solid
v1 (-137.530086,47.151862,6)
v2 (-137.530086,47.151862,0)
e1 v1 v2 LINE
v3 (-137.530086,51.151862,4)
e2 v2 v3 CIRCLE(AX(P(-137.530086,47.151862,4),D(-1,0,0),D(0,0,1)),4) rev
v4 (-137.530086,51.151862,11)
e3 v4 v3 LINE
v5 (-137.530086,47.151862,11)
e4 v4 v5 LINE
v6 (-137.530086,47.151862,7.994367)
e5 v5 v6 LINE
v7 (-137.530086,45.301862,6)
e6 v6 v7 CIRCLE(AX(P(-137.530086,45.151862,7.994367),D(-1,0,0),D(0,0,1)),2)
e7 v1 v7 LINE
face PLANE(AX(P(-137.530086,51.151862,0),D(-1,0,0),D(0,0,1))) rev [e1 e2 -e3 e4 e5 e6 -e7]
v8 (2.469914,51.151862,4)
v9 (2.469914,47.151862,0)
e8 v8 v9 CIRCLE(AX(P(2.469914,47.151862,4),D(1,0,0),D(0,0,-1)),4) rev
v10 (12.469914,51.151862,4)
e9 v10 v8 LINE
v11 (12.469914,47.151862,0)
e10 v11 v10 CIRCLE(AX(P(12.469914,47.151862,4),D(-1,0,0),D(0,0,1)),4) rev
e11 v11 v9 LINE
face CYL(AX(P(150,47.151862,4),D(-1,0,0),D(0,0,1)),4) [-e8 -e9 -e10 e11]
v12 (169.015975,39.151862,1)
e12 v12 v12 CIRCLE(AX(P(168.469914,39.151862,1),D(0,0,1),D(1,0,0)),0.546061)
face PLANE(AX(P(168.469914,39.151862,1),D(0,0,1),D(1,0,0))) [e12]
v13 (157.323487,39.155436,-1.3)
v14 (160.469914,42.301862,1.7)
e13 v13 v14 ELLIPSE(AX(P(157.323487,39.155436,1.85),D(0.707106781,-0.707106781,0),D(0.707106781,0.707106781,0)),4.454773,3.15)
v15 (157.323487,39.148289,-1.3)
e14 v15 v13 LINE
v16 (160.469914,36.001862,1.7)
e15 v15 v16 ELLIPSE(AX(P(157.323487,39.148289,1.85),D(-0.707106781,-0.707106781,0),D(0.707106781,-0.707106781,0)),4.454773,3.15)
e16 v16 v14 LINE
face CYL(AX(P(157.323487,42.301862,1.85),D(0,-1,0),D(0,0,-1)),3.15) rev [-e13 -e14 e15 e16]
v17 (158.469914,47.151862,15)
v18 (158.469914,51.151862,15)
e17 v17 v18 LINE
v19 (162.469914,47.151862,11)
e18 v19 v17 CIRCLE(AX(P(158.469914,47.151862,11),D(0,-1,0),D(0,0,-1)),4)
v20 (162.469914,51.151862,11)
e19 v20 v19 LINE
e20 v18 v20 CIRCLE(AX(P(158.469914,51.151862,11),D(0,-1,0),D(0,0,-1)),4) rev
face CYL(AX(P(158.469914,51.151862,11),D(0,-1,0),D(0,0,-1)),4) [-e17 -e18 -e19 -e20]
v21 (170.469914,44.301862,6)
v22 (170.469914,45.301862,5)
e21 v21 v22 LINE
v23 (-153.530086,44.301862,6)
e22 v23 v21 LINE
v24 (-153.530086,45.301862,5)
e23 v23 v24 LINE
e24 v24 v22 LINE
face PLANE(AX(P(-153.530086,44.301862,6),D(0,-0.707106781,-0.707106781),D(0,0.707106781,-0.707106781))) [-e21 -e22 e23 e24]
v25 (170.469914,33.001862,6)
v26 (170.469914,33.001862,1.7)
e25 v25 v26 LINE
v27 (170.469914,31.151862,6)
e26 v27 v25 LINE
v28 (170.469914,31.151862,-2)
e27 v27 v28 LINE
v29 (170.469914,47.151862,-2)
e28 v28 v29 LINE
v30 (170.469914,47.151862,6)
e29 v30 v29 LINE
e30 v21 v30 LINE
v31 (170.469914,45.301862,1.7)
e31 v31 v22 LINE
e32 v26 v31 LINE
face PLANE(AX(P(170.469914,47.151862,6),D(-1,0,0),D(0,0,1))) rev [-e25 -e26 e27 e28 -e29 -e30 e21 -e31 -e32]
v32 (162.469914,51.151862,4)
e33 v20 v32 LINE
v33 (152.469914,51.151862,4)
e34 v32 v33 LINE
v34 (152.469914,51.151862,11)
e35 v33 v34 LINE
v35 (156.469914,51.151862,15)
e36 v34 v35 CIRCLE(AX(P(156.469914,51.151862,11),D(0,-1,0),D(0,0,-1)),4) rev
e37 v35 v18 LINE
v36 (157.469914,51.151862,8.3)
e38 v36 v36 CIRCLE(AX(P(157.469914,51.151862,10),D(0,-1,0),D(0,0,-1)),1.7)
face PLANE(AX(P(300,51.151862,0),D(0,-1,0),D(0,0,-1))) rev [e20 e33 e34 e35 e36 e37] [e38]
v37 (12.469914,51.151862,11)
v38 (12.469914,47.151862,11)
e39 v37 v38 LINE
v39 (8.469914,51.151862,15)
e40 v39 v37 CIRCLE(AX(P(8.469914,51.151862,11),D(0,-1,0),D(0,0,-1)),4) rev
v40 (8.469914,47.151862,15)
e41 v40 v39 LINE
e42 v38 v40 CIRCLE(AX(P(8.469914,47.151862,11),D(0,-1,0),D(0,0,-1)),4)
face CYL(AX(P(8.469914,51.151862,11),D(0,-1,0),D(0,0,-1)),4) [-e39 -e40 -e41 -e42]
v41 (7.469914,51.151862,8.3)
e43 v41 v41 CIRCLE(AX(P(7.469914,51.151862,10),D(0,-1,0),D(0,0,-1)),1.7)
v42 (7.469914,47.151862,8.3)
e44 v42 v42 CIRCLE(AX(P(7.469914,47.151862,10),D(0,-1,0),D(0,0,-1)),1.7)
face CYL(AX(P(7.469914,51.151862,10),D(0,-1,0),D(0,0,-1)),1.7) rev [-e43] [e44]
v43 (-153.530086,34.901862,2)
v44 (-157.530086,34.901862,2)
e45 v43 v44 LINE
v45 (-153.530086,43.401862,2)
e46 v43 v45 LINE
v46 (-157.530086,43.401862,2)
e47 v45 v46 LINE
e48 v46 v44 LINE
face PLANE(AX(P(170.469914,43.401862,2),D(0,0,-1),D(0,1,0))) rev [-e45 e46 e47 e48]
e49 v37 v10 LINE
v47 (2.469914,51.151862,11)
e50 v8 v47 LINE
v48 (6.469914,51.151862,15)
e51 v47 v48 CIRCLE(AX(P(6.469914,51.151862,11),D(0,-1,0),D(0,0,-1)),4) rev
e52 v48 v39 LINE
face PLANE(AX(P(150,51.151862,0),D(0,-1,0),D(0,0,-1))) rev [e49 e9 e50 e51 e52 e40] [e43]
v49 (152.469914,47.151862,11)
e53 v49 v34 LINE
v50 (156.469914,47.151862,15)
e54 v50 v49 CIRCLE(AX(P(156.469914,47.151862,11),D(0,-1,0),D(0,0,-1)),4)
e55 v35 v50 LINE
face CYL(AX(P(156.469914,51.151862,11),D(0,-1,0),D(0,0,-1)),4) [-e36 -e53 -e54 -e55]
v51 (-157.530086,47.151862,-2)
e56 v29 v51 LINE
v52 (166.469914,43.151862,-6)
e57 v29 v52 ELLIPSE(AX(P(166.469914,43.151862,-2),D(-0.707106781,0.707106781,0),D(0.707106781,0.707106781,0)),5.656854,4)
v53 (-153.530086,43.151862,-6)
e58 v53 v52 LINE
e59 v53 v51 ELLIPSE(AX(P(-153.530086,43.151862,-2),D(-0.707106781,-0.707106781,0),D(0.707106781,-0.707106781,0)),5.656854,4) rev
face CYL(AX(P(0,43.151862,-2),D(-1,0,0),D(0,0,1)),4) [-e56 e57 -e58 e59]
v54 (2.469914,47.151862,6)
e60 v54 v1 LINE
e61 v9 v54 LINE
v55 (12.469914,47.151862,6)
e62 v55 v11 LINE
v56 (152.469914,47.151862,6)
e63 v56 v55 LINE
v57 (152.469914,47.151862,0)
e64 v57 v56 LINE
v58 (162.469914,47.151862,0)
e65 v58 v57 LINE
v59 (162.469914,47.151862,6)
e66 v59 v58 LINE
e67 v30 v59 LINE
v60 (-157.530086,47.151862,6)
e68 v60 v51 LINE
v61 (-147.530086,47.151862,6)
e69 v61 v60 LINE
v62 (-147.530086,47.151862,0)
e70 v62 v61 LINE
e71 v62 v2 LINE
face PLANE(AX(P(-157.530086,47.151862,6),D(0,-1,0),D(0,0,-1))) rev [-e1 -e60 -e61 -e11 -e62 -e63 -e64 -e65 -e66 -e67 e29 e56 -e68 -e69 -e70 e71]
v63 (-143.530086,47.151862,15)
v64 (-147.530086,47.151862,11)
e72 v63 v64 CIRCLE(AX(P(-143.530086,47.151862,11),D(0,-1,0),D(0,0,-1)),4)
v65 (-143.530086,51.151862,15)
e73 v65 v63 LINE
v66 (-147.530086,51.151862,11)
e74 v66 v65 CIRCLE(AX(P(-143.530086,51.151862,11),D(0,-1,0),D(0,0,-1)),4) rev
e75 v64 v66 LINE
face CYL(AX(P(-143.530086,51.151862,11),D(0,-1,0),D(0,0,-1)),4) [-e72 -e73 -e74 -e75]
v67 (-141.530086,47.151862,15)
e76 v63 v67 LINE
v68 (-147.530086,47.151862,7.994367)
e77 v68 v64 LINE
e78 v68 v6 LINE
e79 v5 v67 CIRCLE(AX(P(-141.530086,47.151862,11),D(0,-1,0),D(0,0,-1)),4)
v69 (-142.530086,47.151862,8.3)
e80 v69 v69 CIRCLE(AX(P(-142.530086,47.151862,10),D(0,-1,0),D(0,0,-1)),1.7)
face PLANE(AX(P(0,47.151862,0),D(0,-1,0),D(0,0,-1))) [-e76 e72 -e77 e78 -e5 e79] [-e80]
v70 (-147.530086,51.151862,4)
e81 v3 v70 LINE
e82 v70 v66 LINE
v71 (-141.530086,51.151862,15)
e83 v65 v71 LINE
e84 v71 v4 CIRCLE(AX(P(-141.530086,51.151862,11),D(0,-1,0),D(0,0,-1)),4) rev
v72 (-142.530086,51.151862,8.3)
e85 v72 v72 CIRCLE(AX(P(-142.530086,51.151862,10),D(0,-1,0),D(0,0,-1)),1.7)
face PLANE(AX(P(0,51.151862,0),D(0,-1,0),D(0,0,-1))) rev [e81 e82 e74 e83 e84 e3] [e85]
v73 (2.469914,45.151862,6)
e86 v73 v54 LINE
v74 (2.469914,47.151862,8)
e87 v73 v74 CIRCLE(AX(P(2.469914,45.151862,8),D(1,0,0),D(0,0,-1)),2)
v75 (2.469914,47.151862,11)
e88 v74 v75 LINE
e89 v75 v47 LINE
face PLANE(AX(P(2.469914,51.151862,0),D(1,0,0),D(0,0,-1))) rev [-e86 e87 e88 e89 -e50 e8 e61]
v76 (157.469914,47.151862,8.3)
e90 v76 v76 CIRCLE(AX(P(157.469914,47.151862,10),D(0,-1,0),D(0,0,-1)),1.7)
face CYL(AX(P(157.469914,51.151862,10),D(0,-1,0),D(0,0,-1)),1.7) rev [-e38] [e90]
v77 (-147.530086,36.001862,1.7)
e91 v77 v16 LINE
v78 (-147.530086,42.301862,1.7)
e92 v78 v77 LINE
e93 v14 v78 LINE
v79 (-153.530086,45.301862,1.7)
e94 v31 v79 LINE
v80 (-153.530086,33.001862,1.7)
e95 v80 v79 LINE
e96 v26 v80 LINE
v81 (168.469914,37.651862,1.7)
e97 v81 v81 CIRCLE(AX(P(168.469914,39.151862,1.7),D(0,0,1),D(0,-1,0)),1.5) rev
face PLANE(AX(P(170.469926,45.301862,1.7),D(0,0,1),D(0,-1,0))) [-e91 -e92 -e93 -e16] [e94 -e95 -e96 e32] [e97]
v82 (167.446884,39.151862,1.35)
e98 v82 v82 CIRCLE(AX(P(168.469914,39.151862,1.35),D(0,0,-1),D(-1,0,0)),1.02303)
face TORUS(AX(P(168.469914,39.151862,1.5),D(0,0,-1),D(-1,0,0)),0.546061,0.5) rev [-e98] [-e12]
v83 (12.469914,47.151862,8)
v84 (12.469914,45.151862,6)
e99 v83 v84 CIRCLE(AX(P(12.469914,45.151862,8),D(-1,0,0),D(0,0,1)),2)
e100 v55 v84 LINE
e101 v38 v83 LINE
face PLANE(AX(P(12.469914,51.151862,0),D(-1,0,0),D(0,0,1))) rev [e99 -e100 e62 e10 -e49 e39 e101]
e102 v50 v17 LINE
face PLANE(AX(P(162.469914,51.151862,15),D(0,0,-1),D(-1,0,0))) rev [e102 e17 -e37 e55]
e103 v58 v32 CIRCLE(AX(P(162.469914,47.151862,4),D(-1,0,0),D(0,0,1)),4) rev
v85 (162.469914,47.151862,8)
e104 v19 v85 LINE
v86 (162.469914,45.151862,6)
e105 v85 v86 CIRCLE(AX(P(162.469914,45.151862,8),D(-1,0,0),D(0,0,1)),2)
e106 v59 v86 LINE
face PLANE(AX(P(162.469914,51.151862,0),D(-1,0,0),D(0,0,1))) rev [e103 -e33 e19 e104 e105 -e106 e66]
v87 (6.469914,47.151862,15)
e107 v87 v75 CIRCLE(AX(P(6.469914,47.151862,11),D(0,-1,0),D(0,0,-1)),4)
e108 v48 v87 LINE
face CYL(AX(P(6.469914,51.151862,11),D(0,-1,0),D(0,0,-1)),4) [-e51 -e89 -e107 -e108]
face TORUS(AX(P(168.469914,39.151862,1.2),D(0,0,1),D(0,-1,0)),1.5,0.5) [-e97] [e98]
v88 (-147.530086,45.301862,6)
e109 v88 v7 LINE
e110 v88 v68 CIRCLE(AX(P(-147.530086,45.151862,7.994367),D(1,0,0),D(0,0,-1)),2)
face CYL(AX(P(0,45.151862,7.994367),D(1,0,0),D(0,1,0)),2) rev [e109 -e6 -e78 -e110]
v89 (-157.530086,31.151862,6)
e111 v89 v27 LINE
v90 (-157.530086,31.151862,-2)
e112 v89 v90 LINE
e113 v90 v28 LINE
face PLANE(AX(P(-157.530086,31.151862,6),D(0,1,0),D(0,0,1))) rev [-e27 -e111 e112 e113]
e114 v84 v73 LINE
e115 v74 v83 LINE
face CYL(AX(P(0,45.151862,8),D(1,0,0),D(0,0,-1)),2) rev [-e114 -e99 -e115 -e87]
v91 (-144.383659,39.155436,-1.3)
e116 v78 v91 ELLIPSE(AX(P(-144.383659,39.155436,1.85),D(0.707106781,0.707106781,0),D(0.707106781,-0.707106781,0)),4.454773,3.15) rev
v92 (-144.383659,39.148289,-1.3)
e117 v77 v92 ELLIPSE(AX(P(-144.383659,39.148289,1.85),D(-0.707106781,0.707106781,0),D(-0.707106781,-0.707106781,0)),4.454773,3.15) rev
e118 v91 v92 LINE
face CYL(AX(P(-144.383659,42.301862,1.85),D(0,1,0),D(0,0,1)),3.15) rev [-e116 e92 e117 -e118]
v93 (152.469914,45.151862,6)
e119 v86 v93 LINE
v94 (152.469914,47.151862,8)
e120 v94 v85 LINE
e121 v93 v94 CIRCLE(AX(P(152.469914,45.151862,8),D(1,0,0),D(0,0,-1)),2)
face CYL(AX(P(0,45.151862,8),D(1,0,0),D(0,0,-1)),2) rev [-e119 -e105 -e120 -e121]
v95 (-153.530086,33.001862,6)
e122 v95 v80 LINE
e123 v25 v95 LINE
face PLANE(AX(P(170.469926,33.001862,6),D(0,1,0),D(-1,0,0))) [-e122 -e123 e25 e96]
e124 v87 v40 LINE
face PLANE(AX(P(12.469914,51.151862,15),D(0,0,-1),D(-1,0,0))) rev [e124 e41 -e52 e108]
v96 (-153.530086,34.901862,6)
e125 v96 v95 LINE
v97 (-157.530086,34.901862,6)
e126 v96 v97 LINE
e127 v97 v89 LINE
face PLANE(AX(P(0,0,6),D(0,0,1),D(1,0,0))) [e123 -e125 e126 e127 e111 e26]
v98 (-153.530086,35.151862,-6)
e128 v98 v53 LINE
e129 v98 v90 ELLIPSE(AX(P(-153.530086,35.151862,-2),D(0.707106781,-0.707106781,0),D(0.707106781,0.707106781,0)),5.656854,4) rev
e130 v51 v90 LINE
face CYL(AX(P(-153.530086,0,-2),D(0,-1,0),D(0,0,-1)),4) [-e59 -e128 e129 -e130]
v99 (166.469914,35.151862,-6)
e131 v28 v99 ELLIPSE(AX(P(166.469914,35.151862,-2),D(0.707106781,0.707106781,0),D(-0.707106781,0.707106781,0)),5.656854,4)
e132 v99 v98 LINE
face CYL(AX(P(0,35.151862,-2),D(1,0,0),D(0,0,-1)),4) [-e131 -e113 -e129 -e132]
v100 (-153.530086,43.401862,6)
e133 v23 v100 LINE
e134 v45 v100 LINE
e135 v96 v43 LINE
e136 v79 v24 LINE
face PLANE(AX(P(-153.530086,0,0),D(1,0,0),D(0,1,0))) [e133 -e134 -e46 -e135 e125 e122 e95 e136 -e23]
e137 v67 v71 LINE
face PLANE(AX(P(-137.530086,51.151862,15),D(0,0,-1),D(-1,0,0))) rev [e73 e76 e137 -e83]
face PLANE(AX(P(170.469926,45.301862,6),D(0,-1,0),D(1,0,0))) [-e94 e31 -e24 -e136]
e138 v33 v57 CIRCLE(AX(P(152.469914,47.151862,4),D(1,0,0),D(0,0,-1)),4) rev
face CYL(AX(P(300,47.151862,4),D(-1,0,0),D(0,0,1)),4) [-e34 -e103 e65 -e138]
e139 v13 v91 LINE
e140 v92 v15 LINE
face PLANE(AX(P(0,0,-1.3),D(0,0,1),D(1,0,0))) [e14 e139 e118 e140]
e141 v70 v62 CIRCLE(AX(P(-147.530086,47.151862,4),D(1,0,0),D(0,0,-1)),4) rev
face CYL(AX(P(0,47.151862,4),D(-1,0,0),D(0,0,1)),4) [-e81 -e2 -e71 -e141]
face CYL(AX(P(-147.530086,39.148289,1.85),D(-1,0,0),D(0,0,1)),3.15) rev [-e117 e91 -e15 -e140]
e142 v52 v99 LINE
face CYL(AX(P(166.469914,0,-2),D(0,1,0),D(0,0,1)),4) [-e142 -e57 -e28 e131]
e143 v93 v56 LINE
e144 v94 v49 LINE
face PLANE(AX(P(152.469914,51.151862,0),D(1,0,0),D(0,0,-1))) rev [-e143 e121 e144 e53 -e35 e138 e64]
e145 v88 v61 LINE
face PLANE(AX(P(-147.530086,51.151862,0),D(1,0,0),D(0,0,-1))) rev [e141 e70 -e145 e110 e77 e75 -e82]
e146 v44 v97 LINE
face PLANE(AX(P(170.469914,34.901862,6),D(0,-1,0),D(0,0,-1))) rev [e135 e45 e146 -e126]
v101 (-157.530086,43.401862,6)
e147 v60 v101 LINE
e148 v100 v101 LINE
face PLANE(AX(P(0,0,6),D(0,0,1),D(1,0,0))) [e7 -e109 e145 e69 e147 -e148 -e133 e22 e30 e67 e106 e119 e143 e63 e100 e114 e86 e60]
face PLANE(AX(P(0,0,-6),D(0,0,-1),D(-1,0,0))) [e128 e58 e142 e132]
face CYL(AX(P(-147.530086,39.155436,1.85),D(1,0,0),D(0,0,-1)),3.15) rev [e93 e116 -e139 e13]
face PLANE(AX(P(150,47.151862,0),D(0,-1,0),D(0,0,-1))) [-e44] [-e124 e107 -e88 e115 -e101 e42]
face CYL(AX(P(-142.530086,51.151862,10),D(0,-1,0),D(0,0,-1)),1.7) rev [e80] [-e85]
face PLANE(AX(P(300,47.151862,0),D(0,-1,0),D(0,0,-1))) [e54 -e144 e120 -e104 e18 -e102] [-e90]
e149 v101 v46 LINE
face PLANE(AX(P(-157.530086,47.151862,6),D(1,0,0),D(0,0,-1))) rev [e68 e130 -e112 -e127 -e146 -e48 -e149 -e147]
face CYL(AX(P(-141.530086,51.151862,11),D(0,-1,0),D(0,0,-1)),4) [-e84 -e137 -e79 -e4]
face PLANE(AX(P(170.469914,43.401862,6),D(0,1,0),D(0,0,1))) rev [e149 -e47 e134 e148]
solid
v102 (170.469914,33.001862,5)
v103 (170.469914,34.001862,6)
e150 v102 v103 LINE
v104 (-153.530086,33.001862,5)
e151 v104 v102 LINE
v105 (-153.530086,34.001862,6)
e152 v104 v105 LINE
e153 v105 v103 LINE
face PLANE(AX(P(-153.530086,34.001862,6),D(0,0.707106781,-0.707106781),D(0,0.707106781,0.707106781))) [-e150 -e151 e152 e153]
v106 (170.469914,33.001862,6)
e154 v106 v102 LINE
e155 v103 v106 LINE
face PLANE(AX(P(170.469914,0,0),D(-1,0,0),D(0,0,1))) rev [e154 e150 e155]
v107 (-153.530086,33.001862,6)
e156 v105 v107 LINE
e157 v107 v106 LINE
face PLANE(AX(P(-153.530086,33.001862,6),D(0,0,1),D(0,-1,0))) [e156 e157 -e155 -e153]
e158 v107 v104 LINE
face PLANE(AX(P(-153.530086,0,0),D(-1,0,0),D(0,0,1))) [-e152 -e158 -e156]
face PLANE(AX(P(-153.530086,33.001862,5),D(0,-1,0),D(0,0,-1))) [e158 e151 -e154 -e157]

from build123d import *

# Parameters (mm, degrees)
SKETCH1_W               = 328
SKETCH1_H               = 16
BOSS_EXTRUDE1_DEPTH     = 6
CUT_EXTRUDE1_DEPTH      = 332.42615789
CUT_EXTRUDE1_DEPTH_BACK = 324
SKETCH3_W               = 4.3
SKETCH3_H               = 12.3
SKETCH13_W              = 10
SKETCH13_H              = 15
BOSS_EXTRUDE5_DEPTH     = 4
FILLET10_R              = 4
SKETCH14_R              = 1.7
CUT_EXTRUDE5_DEPTH      = 4
FILLET11_R              = 4
FILLET12_R              = 4
FILLET22_R              = 2
SKETCH17_W              = 328
SKETCH17_H              = 16
BOSS_EXTRUDE6_DEPTH     = 6
FILLET25_R              = 4
SKETCH18_R              = 1
CUT_EXTRUDE6_DEPTH      = 0.7
FILLET26_R              = 0.5
FILLET27_R              = 0.5
SKETCH21_W              = 4
SKETCH21_H              = 8.5
CUT_EXTRUDE8_DEPTH      = 333.303344903
BOSS_EXTRUDE7_DEPTH     = 324
BOSS_EXTRUDE8_DEPTH     = 324
SKETCH25_W              = 308
SKETCH25_H              = 6.3
CUT_EXTRUDE9_DEPTH      = 3
FILLET29_R              = 3.15
LPATTERN1_START         = 47.151862464
LPATTERN1_OUTLINE_R     = 1.7
LPATTERN1_DEPTH         = 4
LPATTERN1_START_2       = 2.46991404
LPATTERN1_2_DEPTH       = 10
LPATTERN1_START_3       = 152.46991404
LPATTERN1_3_DEPTH       = 10


with BuildPart() as part:
    # Sketch1 → Boss-Extrude1 (new body)
    with BuildSketch(Plane.XY):
        with Locations((6.46991404, 39.151862464)):
            Rectangle(SKETCH1_W, SKETCH1_H)
    extrude(amount=BOSS_EXTRUDE1_DEPTH)

    # Sketch3 → Cut-Extrude1 (cut, two sides: drawn at the far end of the back side and taken through both)
    with BuildSketch(Plane(origin=(170.46991404, 0, 0), x_dir=(0, 0, -1), z_dir=(1, 0, 0)).offset(-CUT_EXTRUDE1_DEPTH_BACK)):
        with Locations((-3.85, 39.151862464)):
            Rectangle(SKETCH3_W, SKETCH3_H)
    extrude(amount=CUT_EXTRUDE1_DEPTH + CUT_EXTRUDE1_DEPTH_BACK, mode=Mode.SUBTRACT)

    # Sketch13 → Boss-Extrude5 (add)
    with BuildSketch(Plane(origin=(0, 47.151862464, 0), x_dir=(1, 0, 0), z_dir=(0, 1, 0))):
        with Locations((-142.53008596, -7.5)):
            Rectangle(SKETCH13_W, SKETCH13_H)
    extrude(amount=BOSS_EXTRUDE5_DEPTH)

    # Fillet10
    fillet10_edges = [part.edges().sort_by_distance(p)[0] for p in [
        (-142.53008596, 51.151862464, 0),
    ]]
    fillet(fillet10_edges, radius=FILLET10_R)

    # Sketch14 → Cut-Extrude5 (cut)
    with BuildSketch(Plane.XZ.offset(-47.151862464)):
        with Locations(Location((-142.53008596, 10, 0), (0, 0, 270))):
            Circle(SKETCH14_R)
    extrude(amount=-CUT_EXTRUDE5_DEPTH, mode=Mode.SUBTRACT)

    # Fillet11
    fillet11_edges = [part.edges().sort_by_distance(p)[0] for p in [
        (-137.53008596, 49.151862464, 15),
    ]]
    fillet(fillet11_edges, radius=FILLET11_R)

    # Fillet12
    fillet12_edges = [part.edges().sort_by_distance(p)[0] for p in [
        (-147.53008596, 49.151862464, 15),
    ]]
    fillet(fillet12_edges, radius=FILLET12_R)

    # Fillet22
    # the kernel refuses this fillet: 2 mm, written as the material it adds along each edge
    with BuildSketch(Plane(origin=(-147.53008596, 47.151862464, 6), x_dir=(0, 0, 1), z_dir=(1, 0, 0))) as fillet22_piece_1:
        with BuildLine():
            CenterArc((1.994367068, 2), FILLET22_R, 184.301222305, 85.698777695)
            Line((0, 1.85), (0, 0))
            Line((0, 0), (1.994367068, 0))
        make_face()
    extrude(amount=10)

    # Sketch17 → Boss-Extrude6 (add)
    with BuildSketch(Plane(origin=(0, 0, 0), x_dir=(-1, 0, 0), z_dir=(0, 0, -1))):
        with Locations((-6.46991404, 39.151862464)):
            Rectangle(SKETCH17_W, SKETCH17_H)
    extrude(amount=BOSS_EXTRUDE6_DEPTH)

    # Fillet25
    fillet25_edges = [part.edges().sort_by_distance(p)[0] for p in [
        (170.46991404, 39.151862464, -6),
        (6.46991404, 31.151862464, -6),
        (-157.53008596, 39.151862464, -6),
        (6.46991404, 47.151862464, -6),
    ]]
    fillet(fillet25_edges, radius=FILLET25_R)

    # Sketch18 → Cut-Extrude6 (cut)
    with BuildSketch(Plane.XY.offset(1.7)):
        with Locations((168.46991404, 39.151862464)):
            Circle(SKETCH18_R)
    extrude(amount=-CUT_EXTRUDE6_DEPTH, mode=Mode.SUBTRACT)

    # Fillet26
    fillet26_edges = [part.edges().sort_by_distance(p)[0] for p in [
        (167.46991404, 39.151862464, 1.7),
    ]]
    fillet(fillet26_edges, radius=FILLET26_R)

    # Fillet27
    fillet27_edges = [part.edges().sort_by_distance(p)[0] for p in [
        (167.46991404, 39.151862464, 1),
    ]]
    fillet(fillet27_edges, radius=FILLET27_R)

    # Sketch21 → Cut-Extrude8 (cut, through all)
    with BuildSketch(Plane.ZY.offset(157.53008596)):
        with Locations((4, 39.151862464)):
            Rectangle(SKETCH21_W, SKETCH21_H)
    extrude(amount=-CUT_EXTRUDE8_DEPTH, mode=Mode.SUBTRACT)

    # Sketch23 → Boss-Extrude7 (add)
    with BuildSketch(Plane(origin=(170.46991404, 0, 0), x_dir=(0, 0, -1), z_dir=(1, 0, 0))):
        Polygon((-6, 45.301862464), (-6, 44.301862464), (-5, 45.301862464), align=None)
    extrude(amount=-BOSS_EXTRUDE7_DEPTH)

    # Sketch25 → Cut-Extrude9 (cut)
    with BuildSketch(Plane.XY.offset(1.7)):
        with Locations((6.46991404, 39.151862464)):
            Rectangle(SKETCH25_W, SKETCH25_H)
    extrude(amount=-CUT_EXTRUDE9_DEPTH, mode=Mode.SUBTRACT)

    # Fillet29
    # the kernel refuses this fillet: 3.15 mm, written as the material it adds along each edge
    with BuildSketch(Plane(origin=(-155.396152321, 42.301862464, -1.3), x_dir=(0, 0, 1), z_dir=(1, 0, 0)), Plane(origin=(168.335980401, 36.001862464, -1.3), x_dir=(0, 0, 1), z_dir=(-1, 0, 0))) as fillet29_piece_1:
        with BuildLine():
            CenterArc((3.15, 3.146426545), FILLET29_R, 180, 87.270597363)
            Line((0, 3.146426545), (0, 0))
            Line((0, 0), (3, 0))
        make_face()
    extrude(amount=323.732132723)
    with BuildSketch(Plane(origin=(160.46991404, 50.167928825, -1.3), x_dir=(0, 0, 1), z_dir=(0, -1, 0))) as fillet29_piece_2_section:
        with BuildLine():
            CenterArc((3.15, 3.146426545), FILLET29_R, 180, 87.270597363)
            Line((0, 3.146426545), (0, 0))
            Line((0, 0), (3, 0))
        make_face()
    fillet29_piece_2 = extrude(amount=22.032132723, mode=Mode.PRIVATE)
    fillet29_piece_2 = split(fillet29_piece_2, bisect_by=Plane(origin=(160.46991404, 31.151862464, -1.3), z_dir=(0, 1, 0)), keep=Keep.TOP, mode=Mode.PRIVATE)
    fillet29_piece_2 = split(fillet29_piece_2, bisect_by=Plane(origin=(160.46991404, 47.151862464, -1.3), z_dir=(0, -1, 0)), keep=Keep.TOP, mode=Mode.PRIVATE)
    add(fillet29_piece_2)
    with BuildSketch(Plane(origin=(-147.53008596, 28.135796103, -1.3), x_dir=(0, 0, 1), z_dir=(0, 1, 0))) as fillet29_piece_3_section:
        with BuildLine():
            CenterArc((3.15, 3.146426545), FILLET29_R, 180, 87.270597363)
            Line((0, 3.146426545), (0, 0))
            Line((0, 0), (3, 0))
        make_face()
    fillet29_piece_3 = extrude(amount=22.032132723, mode=Mode.PRIVATE)
    fillet29_piece_3 = split(fillet29_piece_3, bisect_by=Plane(origin=(-147.53008596, 31.151862464, -1.3), z_dir=(0, 1, 0)), keep=Keep.TOP, mode=Mode.PRIVATE)
    fillet29_piece_3 = split(fillet29_piece_3, bisect_by=Plane(origin=(-147.53008596, 47.151862464, -1.3), z_dir=(0, -1, 0)), keep=Keep.TOP, mode=Mode.PRIVATE)
    add(fillet29_piece_3)

    # LPattern1: read off the stored shape, not the designer's step
    # LPattern1 outline → LPattern1 (add)
    # profile 1 of 2: a face of its own
    with BuildSketch(Plane(origin=(0, 0, 0), x_dir=(1, 0, 0), z_dir=(0, 1, 0)).offset(LPATTERN1_START)):
        with BuildLine():
            Line((12.46991404, -11), (12.46991404, -6))
            Line((12.46991404, -6), (2.46991404, -6))
            Line((2.46991404, -6), (2.46991404, -11))
            ThreePointArc((2.46991404, -11), (3.641486915, -13.828427125), (6.46991404, -15))
            Line((6.46991404, -15), (8.46991404, -15))
            ThreePointArc((8.46991404, -15), (11.298341165, -13.828427125), (12.46991404, -11))
        make_face()
        with Locations((7.46991404, -10)):
            Circle(LPATTERN1_OUTLINE_R, mode=Mode.SUBTRACT)
    # profile 2 of 2: a face of its own
    with BuildSketch(Plane(origin=(0, 0, 0), x_dir=(1, 0, 0), z_dir=(0, 1, 0)).offset(LPATTERN1_START)):
        with BuildLine():
            Line((156.46991404, -15), (158.46991404, -15))
            ThreePointArc((158.46991404, -15), (161.298341165, -13.828427125), (162.46991404, -11))
            Line((162.46991404, -11), (162.46991404, -6))
            Line((162.46991404, -6), (152.46991404, -6))
            Line((152.46991404, -6), (152.46991404, -11))
            ThreePointArc((152.46991404, -11), (153.641486915, -13.828427125), (156.46991404, -15))
        make_face()
        with Locations((157.46991404, -10)):
            Circle(LPATTERN1_OUTLINE_R, mode=Mode.SUBTRACT)
    extrude(amount=LPATTERN1_DEPTH)

    # LPattern1 2 outline → LPattern1 2 (add)
    with BuildSketch(Plane.YZ.offset(LPATTERN1_START_2)):
        with BuildLine():
            Line((45.151862464, 6), (47.151862464, 6))
            Line((47.151862464, 6), (47.151862464, 8))
            ThreePointArc((47.151862464, 8), (46.566076026, 6.585786437), (45.151862464, 6))
        make_face()
        with BuildLine():
            Line((51.151862464, 4), (51.151862464, 6))
            Line((51.151862464, 6), (47.151862464, 6))
            Line((47.151862464, 6), (47.151862464, 0))
            ThreePointArc((47.151862464, 0), (49.980289589, 1.171572875), (51.151862464, 4))
        make_face()
    extrude(amount=LPATTERN1_2_DEPTH)

    # LPattern1 3 outline → LPattern1 3 (add)
    with BuildSketch(Plane.YZ.offset(LPATTERN1_START_3)):
        with BuildLine():
            Line((45.151862464, 6), (47.151862464, 6))
            Line((47.151862464, 6), (47.151862464, 8))
            ThreePointArc((47.151862464, 8), (46.566076026, 6.585786437), (45.151862464, 6))
        make_face()
        with BuildLine():
            Line((51.151862464, 4), (51.151862464, 6))
            Line((51.151862464, 6), (47.151862464, 6))
            Line((47.151862464, 6), (47.151862464, 0))
            ThreePointArc((47.151862464, 0), (49.980289589, 1.171572875), (51.151862464, 4))
        make_face()
    extrude(amount=LPATTERN1_3_DEPTH)


with BuildPart() as body_2:
    # Sketch24 → Boss-Extrude8 (new body)
    with BuildSketch(Plane(origin=(170.46991404, 0, 0), x_dir=(0, 0, -1), z_dir=(1, 0, 0))):
        Polygon((-6, 33.001862464), (-6, 34.001862464), (-5, 33.001862464), align=None)
    extrude(amount=-BOSS_EXTRUDE8_DEPTH)


solid = Compound([part.part, body_2.part])
